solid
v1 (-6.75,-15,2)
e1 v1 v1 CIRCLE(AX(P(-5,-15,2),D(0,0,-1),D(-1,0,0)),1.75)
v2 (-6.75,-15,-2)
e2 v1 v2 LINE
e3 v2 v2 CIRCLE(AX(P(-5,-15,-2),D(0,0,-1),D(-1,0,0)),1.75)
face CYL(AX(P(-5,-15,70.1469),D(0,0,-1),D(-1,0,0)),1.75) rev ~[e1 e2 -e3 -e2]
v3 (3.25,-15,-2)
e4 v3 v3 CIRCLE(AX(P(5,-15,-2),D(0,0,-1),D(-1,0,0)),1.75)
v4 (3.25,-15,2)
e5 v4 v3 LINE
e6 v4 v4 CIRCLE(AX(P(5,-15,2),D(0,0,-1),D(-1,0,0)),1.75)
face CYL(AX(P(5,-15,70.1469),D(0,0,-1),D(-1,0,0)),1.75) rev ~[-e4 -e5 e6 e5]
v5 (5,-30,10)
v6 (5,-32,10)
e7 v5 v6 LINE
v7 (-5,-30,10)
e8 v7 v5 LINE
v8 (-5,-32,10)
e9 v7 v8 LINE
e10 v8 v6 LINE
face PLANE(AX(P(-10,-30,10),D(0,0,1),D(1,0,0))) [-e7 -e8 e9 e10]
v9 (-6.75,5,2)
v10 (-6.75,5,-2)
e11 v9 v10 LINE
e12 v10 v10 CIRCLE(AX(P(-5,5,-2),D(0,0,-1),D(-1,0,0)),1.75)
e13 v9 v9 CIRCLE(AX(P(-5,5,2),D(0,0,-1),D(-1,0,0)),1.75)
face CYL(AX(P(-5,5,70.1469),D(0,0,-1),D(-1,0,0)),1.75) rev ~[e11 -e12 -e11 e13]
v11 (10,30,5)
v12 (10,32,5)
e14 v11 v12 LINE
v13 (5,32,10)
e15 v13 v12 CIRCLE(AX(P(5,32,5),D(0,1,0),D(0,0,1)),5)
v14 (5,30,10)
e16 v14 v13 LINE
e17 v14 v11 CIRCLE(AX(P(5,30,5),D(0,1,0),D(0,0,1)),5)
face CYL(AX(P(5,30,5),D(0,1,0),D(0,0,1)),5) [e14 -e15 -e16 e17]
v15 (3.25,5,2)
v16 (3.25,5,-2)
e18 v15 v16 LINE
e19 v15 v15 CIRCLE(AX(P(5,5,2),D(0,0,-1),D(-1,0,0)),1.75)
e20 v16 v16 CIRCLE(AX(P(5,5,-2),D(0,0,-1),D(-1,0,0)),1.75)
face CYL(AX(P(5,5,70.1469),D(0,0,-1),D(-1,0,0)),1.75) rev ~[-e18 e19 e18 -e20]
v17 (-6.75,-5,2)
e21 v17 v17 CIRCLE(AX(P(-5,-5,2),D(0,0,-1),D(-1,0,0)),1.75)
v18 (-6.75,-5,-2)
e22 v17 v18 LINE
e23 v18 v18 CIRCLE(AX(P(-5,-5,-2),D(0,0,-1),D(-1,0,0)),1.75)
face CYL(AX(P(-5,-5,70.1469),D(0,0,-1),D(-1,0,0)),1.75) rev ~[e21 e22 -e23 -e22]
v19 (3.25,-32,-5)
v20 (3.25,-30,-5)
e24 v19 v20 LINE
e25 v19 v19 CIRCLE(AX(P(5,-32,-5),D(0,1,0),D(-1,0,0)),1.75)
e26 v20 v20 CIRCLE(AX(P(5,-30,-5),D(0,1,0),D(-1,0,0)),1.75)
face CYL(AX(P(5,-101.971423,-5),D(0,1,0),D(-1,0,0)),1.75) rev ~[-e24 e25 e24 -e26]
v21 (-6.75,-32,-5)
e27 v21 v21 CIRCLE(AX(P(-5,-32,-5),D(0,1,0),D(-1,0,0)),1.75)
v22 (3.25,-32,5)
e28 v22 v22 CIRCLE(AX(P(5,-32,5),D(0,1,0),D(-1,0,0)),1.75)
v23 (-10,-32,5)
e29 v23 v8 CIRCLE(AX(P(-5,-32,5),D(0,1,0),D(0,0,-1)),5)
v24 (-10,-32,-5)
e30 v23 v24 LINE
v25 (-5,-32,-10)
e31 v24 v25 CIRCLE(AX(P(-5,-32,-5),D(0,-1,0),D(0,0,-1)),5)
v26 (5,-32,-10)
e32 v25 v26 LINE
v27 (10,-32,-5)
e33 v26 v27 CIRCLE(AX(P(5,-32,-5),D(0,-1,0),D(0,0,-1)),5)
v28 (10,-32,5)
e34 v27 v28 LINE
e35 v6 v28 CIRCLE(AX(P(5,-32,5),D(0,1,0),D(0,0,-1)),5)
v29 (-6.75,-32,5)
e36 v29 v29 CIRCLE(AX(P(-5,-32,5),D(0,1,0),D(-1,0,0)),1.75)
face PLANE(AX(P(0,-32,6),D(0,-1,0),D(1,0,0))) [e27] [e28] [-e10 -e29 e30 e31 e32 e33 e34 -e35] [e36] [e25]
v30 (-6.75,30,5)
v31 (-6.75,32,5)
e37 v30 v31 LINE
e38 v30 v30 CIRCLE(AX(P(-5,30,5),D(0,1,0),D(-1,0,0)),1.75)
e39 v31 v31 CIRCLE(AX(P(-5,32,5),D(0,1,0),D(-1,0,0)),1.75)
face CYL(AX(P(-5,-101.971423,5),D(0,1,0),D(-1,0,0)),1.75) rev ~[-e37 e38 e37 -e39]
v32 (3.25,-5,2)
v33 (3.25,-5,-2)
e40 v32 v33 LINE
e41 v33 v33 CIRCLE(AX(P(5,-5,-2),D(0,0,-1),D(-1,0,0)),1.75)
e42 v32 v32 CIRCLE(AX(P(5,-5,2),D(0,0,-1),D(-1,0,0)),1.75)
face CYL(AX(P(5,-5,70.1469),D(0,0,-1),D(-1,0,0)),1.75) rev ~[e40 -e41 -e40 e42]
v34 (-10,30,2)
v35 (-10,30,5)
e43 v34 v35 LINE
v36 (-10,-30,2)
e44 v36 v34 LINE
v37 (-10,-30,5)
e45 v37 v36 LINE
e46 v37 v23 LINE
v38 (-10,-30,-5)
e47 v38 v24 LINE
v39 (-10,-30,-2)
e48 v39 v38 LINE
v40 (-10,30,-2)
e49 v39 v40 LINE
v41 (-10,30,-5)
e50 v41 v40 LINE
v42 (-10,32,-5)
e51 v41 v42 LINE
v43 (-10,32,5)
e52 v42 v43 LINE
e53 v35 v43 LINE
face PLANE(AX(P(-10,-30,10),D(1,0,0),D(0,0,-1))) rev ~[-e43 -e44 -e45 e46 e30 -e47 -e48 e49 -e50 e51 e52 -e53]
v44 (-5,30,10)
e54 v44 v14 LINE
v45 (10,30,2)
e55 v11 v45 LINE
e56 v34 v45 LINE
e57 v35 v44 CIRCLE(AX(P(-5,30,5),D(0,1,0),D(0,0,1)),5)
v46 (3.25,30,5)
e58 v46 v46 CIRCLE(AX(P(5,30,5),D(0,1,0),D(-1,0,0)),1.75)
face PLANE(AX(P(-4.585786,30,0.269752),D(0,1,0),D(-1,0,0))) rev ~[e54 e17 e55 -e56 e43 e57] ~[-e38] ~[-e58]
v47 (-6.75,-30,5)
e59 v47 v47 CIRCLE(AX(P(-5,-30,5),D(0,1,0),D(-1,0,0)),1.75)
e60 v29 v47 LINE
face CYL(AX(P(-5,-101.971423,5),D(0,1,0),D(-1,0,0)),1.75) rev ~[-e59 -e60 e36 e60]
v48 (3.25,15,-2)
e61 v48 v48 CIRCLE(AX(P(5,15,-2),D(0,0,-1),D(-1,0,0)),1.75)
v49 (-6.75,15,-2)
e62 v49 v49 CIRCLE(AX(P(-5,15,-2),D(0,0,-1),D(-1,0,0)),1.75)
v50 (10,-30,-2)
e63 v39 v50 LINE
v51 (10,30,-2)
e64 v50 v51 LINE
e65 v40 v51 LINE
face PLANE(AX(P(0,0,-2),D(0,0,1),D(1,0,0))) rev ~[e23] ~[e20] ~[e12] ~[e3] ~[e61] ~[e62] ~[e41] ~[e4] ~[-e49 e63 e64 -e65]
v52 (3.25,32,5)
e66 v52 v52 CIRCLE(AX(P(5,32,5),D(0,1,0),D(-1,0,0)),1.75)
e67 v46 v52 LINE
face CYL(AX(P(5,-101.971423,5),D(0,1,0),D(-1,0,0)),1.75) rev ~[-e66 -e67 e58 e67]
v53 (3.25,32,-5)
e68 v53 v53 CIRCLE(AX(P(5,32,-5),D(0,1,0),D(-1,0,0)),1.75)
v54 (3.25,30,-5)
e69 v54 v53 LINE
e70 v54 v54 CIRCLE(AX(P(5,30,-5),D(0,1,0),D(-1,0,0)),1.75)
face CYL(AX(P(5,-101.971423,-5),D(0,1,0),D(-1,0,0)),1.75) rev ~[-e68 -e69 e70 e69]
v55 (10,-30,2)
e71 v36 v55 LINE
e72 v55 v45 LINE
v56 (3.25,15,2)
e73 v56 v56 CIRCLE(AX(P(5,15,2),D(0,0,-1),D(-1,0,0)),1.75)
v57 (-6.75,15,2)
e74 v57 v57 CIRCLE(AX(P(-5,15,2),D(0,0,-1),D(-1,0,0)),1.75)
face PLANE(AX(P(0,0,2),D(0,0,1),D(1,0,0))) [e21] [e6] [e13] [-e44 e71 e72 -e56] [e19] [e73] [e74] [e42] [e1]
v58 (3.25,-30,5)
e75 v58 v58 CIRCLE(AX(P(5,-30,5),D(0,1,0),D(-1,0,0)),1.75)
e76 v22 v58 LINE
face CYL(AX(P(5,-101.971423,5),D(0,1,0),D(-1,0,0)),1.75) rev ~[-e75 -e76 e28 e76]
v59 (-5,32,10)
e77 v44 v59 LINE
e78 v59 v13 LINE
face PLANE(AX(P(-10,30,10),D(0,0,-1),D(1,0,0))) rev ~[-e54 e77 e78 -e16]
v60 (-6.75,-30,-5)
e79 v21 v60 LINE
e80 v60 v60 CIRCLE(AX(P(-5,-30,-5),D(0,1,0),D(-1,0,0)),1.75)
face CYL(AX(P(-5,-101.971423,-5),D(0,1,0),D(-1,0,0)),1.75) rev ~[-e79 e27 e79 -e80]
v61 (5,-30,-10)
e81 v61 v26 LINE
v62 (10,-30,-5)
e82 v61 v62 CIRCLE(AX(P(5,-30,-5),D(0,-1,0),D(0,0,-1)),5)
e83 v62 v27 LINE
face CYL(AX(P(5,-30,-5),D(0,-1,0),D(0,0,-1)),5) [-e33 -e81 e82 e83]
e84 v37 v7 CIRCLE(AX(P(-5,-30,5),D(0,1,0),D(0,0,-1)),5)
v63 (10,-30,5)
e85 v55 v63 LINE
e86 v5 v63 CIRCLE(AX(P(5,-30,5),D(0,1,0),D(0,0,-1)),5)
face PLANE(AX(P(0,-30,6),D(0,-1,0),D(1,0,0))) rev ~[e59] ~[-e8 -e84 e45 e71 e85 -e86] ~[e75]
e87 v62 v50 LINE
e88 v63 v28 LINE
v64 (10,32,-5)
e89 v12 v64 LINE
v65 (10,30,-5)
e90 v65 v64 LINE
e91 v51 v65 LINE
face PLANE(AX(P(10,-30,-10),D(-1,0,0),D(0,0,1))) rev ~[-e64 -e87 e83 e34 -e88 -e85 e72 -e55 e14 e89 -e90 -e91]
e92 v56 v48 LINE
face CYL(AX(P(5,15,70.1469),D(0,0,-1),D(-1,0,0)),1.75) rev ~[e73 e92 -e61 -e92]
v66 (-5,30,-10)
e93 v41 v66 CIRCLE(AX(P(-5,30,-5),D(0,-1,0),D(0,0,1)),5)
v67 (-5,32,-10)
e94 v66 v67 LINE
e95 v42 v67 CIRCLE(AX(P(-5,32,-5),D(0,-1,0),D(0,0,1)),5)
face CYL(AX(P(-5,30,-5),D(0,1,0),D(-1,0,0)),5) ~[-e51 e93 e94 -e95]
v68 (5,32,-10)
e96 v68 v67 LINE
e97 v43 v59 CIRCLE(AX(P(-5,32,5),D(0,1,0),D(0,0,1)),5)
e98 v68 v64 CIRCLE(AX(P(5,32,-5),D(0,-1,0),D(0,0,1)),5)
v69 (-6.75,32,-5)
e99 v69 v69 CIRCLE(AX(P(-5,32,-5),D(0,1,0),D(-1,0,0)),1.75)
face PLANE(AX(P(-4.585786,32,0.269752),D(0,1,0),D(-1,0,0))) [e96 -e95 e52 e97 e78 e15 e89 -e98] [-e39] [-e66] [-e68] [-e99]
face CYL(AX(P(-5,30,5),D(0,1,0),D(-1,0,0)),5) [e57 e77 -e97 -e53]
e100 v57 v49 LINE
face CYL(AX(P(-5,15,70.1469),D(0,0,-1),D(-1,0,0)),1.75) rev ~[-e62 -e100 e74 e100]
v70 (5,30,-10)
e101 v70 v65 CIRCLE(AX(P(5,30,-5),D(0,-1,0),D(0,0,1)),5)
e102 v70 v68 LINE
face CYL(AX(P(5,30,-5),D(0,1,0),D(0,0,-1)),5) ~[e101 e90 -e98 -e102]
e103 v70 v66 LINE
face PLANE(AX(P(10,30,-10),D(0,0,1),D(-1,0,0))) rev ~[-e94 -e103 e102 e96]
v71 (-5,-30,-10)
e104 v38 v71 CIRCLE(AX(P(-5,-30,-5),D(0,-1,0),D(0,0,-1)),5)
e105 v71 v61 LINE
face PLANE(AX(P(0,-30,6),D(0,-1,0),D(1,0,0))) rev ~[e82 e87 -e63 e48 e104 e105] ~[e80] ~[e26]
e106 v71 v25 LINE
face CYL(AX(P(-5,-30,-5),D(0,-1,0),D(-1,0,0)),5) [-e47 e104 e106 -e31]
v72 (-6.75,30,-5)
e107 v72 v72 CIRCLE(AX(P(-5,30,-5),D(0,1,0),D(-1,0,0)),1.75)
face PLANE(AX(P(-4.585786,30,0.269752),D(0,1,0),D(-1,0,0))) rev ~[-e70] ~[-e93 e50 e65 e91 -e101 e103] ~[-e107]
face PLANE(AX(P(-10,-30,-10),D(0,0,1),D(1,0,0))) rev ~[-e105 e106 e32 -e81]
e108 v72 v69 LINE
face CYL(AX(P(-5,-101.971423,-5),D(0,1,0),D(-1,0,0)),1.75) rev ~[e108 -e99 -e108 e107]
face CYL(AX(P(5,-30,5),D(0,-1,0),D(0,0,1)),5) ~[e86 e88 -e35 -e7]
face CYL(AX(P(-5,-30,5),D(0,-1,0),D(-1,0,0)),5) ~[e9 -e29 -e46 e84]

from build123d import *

# Parameters (mm, degrees)
F0_W     = 20
F0_H     = 60
F1_DEPTH = 2
F3_DEPTH = 2
F5_D     = 3.5
F6_W     = 20
F6_H     = 8
F6_H_2   = 4
F7_DEPTH = 2
F9_D     = 3.5
F10_R    = 5


# Not quite as in the source:
# - a feature names something its author has since deleted; it is built from what else it names


with BuildPart() as f1:
    # F0 (on Top) → F1 (new body, symmetric)
    with BuildSketch(Plane.XY):
        Rectangle(F0_W, F0_H)
    extrude(amount=F1_DEPTH, both=True)

    # F2 (on face) → F3 (join)
    with BuildSketch(Plane(origin=(0, 30, 0), x_dir=(-1, 0, 0), z_dir=(0, 1, 0))):
        Polygon((10, 2), (-2, 2), (2, -2), (10, -2), align=None)
        Polygon((-2, 2), (-10, 2), (-10, -2), (2, -2), align=None)
        Polygon((10, 10), (-10, 10), (-2, 2), (10, 2), align=None)
        Polygon((2, -2), (-10, -2), (-10, -10), (10, -10), align=None)
        Polygon((10, -2), (2, -2), (10, -10), align=None)
        Polygon((-2, 2), (-10, 10), (-10, 2), align=None)
    extrude(amount=F3_DEPTH)

    # F5 (through all)
    with Locations(Plane.XY.offset(2)):
        with Locations((5, 15), (-5, 15), (-5, 5), (5, 5), (5, -5), (-5, -5), (-5, -15), (5, -15)):
            Hole(F5_D / 2)

    # F6 (on face) → F7 (join)
    with BuildSketch(Plane.XZ.offset(30)):
        with Locations((0, 6)):
            Rectangle(F6_W, F6_H)
        Rectangle(F6_W, F6_H_2)
        with Locations((0, -6)):
            Rectangle(F6_W, F6_H)
    extrude(amount=F7_DEPTH)

    # F9 (through all)
    with Locations(Plane.XZ.offset(32)):
        with Locations((-5, 5), (5, 5), (5, -5), (-5, -5)):
            Hole(F9_D / 2)

    # F10
    f10_edges = [f1.edges().sort_by_distance(p)[0] for p in [
        (10, -31, 10),
        (10, -31, -10),
        (10, 31, 10),
        (10, 31, -10),
        (-10, 31, -10),
        (-10, 31, 10),
        (-10, -31, 10),
        (-10, -31, -10),
    ]]
    fillet(f10_edges, radius=F10_R)


solid = f1.part
